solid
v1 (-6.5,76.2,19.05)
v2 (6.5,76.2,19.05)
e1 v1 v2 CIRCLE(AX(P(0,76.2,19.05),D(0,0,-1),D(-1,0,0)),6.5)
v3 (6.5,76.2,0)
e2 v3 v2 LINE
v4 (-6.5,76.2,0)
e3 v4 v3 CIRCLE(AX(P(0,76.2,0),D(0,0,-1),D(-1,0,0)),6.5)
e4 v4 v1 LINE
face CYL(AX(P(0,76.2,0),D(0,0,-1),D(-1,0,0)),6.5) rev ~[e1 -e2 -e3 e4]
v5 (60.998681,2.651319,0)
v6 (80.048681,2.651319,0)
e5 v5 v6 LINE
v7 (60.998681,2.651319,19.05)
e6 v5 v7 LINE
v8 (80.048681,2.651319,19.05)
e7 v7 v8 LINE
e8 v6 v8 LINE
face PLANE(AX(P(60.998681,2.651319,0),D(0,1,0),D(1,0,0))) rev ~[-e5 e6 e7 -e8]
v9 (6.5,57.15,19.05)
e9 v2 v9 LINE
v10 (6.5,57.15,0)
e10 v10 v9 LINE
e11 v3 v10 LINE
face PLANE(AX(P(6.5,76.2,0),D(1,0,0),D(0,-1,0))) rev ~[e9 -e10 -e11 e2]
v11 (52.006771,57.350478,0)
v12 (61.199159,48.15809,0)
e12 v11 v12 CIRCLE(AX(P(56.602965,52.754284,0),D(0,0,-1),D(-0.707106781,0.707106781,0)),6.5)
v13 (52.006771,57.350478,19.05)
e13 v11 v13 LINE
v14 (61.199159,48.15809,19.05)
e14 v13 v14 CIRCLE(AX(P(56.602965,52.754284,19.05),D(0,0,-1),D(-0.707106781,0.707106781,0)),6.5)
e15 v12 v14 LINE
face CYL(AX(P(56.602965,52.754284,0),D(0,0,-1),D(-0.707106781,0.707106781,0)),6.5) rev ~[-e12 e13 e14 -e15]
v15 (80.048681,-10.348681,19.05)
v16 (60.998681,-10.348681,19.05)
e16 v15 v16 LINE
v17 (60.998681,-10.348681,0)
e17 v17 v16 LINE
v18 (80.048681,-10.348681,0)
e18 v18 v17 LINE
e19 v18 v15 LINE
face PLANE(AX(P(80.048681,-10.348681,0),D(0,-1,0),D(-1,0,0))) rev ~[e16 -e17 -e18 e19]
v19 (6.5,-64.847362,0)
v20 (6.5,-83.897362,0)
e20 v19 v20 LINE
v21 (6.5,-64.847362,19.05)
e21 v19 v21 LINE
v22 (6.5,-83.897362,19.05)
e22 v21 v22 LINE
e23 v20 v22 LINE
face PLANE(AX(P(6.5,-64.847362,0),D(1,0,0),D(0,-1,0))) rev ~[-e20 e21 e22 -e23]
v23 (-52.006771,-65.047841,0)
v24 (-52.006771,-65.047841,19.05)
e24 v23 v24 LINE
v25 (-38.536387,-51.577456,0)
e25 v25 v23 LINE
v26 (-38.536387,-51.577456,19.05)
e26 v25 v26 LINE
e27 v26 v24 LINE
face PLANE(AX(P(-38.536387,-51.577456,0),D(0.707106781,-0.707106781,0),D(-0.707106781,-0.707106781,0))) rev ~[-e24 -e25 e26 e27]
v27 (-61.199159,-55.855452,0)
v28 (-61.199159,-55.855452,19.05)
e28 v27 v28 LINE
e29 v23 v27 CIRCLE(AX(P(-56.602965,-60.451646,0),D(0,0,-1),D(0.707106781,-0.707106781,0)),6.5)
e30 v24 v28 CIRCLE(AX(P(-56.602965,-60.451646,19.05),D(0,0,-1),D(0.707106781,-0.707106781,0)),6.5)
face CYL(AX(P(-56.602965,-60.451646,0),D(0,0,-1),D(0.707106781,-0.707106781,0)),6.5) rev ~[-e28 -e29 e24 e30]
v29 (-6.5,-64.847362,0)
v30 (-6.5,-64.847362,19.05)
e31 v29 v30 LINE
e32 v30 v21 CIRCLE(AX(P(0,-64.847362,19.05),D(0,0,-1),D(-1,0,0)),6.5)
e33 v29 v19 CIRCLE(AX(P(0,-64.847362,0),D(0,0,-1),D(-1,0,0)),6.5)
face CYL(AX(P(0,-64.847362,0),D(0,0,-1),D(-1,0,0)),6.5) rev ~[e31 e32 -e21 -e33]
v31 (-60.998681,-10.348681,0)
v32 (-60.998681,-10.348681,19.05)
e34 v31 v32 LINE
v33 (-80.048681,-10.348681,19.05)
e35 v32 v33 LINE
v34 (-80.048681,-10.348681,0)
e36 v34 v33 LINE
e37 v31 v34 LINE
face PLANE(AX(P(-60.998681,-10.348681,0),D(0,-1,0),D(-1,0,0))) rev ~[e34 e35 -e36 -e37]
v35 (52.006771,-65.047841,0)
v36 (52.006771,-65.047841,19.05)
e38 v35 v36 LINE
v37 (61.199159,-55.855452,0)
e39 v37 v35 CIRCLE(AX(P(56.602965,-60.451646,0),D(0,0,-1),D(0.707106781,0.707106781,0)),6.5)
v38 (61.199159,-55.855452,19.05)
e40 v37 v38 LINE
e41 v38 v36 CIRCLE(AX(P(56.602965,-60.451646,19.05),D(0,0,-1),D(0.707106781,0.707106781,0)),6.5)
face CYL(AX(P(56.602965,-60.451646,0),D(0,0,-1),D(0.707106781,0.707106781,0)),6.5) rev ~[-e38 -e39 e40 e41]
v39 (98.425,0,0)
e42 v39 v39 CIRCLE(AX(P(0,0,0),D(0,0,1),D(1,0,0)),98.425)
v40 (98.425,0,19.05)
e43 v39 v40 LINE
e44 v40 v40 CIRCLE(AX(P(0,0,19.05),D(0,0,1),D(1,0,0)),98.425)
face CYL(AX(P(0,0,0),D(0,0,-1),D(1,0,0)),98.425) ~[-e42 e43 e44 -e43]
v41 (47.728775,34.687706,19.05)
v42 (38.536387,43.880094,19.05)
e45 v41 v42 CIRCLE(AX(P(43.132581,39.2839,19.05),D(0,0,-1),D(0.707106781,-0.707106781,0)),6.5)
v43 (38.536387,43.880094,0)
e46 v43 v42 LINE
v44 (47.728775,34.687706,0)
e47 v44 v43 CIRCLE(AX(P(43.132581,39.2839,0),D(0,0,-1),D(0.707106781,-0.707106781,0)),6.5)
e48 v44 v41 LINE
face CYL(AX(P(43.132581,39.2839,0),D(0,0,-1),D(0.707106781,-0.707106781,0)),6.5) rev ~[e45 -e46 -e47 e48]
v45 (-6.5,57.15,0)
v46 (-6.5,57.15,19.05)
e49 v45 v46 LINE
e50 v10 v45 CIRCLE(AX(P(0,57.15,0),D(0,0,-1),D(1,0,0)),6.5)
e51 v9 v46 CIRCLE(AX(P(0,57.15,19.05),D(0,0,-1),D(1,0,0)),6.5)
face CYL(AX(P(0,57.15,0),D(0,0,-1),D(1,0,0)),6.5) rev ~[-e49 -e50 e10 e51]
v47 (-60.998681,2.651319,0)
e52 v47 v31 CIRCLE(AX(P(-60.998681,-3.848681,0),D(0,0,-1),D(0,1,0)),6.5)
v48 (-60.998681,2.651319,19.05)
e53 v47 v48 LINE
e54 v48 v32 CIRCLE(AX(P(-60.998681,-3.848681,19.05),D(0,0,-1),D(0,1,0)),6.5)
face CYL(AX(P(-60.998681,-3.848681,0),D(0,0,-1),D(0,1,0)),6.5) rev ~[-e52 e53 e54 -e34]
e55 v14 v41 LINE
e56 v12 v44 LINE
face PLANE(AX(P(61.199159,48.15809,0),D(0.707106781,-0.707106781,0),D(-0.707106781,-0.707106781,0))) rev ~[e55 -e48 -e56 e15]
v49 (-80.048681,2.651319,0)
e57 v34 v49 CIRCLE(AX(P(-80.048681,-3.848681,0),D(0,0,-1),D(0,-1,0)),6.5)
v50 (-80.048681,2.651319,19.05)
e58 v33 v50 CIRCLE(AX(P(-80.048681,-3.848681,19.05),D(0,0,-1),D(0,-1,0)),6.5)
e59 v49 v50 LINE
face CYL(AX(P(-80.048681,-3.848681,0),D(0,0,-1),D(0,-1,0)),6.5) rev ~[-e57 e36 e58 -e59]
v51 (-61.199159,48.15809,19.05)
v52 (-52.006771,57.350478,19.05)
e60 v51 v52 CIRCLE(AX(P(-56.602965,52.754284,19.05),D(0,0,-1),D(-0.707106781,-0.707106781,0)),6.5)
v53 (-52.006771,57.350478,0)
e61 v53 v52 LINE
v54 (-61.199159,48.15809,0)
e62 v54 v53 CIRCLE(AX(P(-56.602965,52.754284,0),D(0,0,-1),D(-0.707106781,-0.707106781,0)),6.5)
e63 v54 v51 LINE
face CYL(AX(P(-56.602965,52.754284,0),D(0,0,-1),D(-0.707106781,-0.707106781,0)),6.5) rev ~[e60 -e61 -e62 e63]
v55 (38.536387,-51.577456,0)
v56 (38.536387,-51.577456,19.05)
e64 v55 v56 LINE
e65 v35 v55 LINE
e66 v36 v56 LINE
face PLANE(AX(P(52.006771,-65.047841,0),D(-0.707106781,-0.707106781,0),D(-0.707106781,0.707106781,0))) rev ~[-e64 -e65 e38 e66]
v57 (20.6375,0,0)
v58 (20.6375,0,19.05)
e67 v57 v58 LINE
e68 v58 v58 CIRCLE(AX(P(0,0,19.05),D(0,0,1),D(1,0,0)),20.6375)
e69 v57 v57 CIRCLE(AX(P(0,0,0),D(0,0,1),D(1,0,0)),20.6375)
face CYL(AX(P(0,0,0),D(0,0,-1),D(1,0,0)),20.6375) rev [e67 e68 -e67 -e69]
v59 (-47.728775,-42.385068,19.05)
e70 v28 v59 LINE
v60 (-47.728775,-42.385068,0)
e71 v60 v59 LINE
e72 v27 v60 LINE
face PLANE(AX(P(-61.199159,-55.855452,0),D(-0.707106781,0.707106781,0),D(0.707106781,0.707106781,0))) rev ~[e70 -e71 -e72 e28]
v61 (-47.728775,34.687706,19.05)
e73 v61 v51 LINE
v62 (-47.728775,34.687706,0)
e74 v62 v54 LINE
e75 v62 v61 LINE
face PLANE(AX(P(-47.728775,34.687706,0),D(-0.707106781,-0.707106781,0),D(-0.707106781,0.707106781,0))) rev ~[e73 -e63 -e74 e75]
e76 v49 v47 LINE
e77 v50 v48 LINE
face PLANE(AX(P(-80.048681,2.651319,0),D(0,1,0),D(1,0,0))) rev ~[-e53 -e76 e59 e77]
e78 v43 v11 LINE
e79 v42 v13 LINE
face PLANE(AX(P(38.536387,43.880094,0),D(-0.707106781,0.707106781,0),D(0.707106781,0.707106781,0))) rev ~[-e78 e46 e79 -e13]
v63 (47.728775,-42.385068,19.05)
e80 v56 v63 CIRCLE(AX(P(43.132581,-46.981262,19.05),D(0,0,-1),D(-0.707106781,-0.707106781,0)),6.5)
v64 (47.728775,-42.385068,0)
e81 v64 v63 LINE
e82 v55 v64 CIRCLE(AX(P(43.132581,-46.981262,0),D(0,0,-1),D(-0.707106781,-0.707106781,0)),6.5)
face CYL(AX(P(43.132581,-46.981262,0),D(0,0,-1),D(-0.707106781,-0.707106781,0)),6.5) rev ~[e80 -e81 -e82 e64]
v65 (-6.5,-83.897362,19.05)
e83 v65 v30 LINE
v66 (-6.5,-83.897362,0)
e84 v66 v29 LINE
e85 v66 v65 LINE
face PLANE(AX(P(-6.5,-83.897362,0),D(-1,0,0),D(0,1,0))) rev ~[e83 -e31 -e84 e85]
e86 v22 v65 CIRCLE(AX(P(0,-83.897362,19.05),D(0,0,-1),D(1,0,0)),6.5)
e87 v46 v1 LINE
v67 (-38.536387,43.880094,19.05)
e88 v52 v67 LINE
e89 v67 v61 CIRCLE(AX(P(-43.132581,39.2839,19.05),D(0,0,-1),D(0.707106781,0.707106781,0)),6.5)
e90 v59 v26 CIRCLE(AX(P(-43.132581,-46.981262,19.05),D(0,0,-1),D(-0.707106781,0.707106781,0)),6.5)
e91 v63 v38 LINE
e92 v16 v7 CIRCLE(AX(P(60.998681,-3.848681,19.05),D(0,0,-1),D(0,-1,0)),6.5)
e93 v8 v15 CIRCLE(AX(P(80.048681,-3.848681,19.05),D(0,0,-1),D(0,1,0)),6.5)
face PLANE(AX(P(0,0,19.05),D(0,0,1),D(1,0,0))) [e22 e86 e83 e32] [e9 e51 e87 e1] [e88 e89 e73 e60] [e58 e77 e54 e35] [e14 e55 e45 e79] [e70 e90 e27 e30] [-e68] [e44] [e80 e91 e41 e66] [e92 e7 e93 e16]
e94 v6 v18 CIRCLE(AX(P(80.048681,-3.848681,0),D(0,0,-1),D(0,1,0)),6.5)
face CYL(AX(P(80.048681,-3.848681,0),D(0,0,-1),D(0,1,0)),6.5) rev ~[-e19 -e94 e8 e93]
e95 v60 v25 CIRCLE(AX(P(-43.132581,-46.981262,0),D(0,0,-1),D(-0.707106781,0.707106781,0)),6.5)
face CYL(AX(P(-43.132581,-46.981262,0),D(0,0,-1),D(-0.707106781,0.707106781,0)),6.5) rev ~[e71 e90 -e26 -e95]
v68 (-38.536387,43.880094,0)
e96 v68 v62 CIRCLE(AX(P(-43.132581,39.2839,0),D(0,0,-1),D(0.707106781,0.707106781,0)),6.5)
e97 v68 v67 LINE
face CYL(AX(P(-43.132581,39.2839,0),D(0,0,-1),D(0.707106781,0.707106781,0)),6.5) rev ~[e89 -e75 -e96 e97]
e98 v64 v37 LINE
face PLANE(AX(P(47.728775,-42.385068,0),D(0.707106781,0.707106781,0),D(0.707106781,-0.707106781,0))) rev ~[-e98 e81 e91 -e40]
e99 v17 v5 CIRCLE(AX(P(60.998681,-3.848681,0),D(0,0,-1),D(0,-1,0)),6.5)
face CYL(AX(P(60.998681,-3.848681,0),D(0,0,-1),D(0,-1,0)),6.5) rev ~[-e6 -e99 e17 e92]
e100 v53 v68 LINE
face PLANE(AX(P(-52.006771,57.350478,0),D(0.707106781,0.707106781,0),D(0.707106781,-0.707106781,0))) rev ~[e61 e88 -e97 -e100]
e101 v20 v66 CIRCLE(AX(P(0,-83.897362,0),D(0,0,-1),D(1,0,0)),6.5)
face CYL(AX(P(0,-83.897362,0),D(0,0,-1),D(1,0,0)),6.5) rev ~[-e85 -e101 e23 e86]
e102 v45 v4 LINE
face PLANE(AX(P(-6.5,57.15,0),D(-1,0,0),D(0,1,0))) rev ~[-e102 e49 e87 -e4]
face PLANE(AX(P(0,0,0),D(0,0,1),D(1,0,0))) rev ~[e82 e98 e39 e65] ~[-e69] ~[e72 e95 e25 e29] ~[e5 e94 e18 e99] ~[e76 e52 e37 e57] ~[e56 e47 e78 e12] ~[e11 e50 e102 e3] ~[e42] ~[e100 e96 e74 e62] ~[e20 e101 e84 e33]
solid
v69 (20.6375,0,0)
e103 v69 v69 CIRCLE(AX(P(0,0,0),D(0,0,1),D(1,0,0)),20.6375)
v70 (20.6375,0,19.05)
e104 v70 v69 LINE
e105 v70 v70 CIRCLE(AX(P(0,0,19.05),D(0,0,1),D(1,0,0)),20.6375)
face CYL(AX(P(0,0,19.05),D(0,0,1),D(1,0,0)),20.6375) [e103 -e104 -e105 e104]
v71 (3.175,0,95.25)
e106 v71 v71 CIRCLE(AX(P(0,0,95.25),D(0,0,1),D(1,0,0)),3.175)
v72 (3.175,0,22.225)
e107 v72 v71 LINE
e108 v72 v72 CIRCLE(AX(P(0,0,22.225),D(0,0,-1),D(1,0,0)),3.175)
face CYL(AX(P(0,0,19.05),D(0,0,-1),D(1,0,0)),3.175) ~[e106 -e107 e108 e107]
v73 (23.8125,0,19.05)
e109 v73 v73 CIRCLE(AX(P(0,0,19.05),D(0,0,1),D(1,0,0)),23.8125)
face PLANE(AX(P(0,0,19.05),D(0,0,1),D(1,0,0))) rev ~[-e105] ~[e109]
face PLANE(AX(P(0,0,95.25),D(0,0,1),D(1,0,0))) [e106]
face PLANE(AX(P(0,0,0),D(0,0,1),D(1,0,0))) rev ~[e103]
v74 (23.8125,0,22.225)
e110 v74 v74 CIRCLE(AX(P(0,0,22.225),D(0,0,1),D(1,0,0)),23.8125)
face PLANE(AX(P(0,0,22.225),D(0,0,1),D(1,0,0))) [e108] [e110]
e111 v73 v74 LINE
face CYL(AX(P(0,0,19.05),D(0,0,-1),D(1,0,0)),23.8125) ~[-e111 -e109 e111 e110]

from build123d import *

# Parameters (mm, degrees)
F0_R     = 98.425
F0_R_2   = 20.6375
F1_DEPTH = 19.05
F2_R     = 20.6375
F3_DEPTH = 19.05
F4_R     = 3.175
F5_DEPTH = 76.2
F2_R_2   = 23.8125
F6_DEPTH = 3.175


with BuildPart() as f1:
    # F0 (on Top) → F1 (new body)
    with BuildSketch(Plane.XY):
        Circle(F0_R)
        with BuildLine():
            Line((-61.1991593756, -55.8554524149), (-47.728775194, -42.3850682333))
            ThreePointArc((-47.728775194, -42.3850682333), (-38.5363870385, -42.3850682333), (-38.5363870385, -51.5774563887))
            Line((-38.5363870385, -51.5774563887), (-52.0067712201, -65.0478405703))
            ThreePointArc((-52.0067712201, -65.0478405703), (-61.1991593756, -65.0478405703), (-61.1991593756, -55.8554524149))
        make_face(mode=Mode.SUBTRACT)
        with BuildLine():
            Line((-80.0486811947, 2.6513188053), (-60.9986811947, 2.6513188053))
            ThreePointArc((-60.9986811947, 2.6513188053), (-54.4986811947, -3.8486811947), (-60.9986811947, -10.3486811947))
            Line((-60.9986811947, -10.3486811947), (-80.0486811947, -10.3486811947))
            ThreePointArc((-80.0486811947, -10.3486811947), (-86.5486811947, -3.8486811947), (-80.0486811947, 2.6513188053))
        make_face(mode=Mode.SUBTRACT)
        with BuildLine():
            Line((-6.5, -83.8973623895), (-6.5, -64.8473623895))
            ThreePointArc((-6.5, -64.8473623895), (0, -58.3473623895), (6.5, -64.8473623895))
            Line((6.5, -64.8473623895), (6.5, -83.8973623895))
            ThreePointArc((6.5, -83.8973623895), (0, -90.3973623895), (-6.5, -83.8973623895))
        make_face(mode=Mode.SUBTRACT)
        with BuildLine():
            Line((52.0067712201, -65.0478405703), (38.5363870385, -51.5774563887))
            ThreePointArc((38.5363870385, -51.5774563887), (38.5363870385, -42.3850682333), (47.728775194, -42.3850682333))
            Line((47.728775194, -42.3850682333), (61.1991593756, -55.8554524149))
            ThreePointArc((61.1991593756, -55.8554524149), (61.1991593756, -65.0478405703), (52.0067712201, -65.0478405703))
        make_face(mode=Mode.SUBTRACT)
        with BuildLine():
            Line((80.0486811947, -10.3486811947), (60.9986811947, -10.3486811947))
            ThreePointArc((60.9986811947, -10.3486811947), (54.4986811947, -3.8486811947), (60.9986811947, 2.6513188053))
            Line((60.9986811947, 2.6513188053), (80.0486811947, 2.6513188053))
            ThreePointArc((80.0486811947, 2.6513188053), (86.5486811947, -3.8486811947), (80.0486811947, -10.3486811947))
        make_face(mode=Mode.SUBTRACT)
        with BuildLine():
            Line((-52.0067712201, 57.3504781808), (-38.5363870385, 43.8800939992))
            ThreePointArc((-38.5363870385, 43.8800939992), (-38.5363870385, 34.6877058438), (-47.728775194, 34.6877058438))
            Line((-47.728775194, 34.6877058438), (-61.1991593756, 48.1580900254))
            ThreePointArc((-61.1991593756, 48.1580900254), (-61.1991593756, 57.3504781808), (-52.0067712201, 57.3504781808))
        make_face(mode=Mode.SUBTRACT)
        Circle(F0_R_2, mode=Mode.SUBTRACT)
        with BuildLine():
            Line((61.1991593756, 48.1580900254), (47.728775194, 34.6877058438))
            ThreePointArc((47.728775194, 34.6877058438), (38.5363870385, 34.6877058438), (38.5363870385, 43.8800939992))
            Line((38.5363870385, 43.8800939992), (52.0067712201, 57.3504781808))
            ThreePointArc((52.0067712201, 57.3504781808), (61.1991593756, 57.3504781808), (61.1991593756, 48.1580900254))
        make_face(mode=Mode.SUBTRACT)
        with BuildLine():
            Line((6.5, 76.2), (6.5, 57.15))
            ThreePointArc((6.5, 57.15), (0, 50.65), (-6.5, 57.15))
            Line((-6.5, 57.15), (-6.5, 76.2))
            ThreePointArc((-6.5, 76.2), (0, 82.7), (6.5, 76.2))
        make_face(mode=Mode.SUBTRACT)
    extrude(amount=F1_DEPTH)


with BuildPart() as f3:
    # F2 (on face) → F3 (new body, through all)
    with BuildSketch(Plane.XY.offset(19.05)):
        Circle(F2_R)
    extrude(amount=-F3_DEPTH)

    # F4 (on face) → F5 (join)
    with BuildSketch(Plane.XY.offset(19.05)):
        Circle(F4_R)
    extrude(amount=F5_DEPTH)

    # F2 (on face) → F6 (join)
    with BuildSketch(Plane.XY.offset(19.05)):
        Circle(F2_R_2)
        Circle(F2_R, mode=Mode.SUBTRACT)
        Circle(F2_R)
    extrude(amount=F6_DEPTH)


solid = Compound([f1.part, f3.part])
